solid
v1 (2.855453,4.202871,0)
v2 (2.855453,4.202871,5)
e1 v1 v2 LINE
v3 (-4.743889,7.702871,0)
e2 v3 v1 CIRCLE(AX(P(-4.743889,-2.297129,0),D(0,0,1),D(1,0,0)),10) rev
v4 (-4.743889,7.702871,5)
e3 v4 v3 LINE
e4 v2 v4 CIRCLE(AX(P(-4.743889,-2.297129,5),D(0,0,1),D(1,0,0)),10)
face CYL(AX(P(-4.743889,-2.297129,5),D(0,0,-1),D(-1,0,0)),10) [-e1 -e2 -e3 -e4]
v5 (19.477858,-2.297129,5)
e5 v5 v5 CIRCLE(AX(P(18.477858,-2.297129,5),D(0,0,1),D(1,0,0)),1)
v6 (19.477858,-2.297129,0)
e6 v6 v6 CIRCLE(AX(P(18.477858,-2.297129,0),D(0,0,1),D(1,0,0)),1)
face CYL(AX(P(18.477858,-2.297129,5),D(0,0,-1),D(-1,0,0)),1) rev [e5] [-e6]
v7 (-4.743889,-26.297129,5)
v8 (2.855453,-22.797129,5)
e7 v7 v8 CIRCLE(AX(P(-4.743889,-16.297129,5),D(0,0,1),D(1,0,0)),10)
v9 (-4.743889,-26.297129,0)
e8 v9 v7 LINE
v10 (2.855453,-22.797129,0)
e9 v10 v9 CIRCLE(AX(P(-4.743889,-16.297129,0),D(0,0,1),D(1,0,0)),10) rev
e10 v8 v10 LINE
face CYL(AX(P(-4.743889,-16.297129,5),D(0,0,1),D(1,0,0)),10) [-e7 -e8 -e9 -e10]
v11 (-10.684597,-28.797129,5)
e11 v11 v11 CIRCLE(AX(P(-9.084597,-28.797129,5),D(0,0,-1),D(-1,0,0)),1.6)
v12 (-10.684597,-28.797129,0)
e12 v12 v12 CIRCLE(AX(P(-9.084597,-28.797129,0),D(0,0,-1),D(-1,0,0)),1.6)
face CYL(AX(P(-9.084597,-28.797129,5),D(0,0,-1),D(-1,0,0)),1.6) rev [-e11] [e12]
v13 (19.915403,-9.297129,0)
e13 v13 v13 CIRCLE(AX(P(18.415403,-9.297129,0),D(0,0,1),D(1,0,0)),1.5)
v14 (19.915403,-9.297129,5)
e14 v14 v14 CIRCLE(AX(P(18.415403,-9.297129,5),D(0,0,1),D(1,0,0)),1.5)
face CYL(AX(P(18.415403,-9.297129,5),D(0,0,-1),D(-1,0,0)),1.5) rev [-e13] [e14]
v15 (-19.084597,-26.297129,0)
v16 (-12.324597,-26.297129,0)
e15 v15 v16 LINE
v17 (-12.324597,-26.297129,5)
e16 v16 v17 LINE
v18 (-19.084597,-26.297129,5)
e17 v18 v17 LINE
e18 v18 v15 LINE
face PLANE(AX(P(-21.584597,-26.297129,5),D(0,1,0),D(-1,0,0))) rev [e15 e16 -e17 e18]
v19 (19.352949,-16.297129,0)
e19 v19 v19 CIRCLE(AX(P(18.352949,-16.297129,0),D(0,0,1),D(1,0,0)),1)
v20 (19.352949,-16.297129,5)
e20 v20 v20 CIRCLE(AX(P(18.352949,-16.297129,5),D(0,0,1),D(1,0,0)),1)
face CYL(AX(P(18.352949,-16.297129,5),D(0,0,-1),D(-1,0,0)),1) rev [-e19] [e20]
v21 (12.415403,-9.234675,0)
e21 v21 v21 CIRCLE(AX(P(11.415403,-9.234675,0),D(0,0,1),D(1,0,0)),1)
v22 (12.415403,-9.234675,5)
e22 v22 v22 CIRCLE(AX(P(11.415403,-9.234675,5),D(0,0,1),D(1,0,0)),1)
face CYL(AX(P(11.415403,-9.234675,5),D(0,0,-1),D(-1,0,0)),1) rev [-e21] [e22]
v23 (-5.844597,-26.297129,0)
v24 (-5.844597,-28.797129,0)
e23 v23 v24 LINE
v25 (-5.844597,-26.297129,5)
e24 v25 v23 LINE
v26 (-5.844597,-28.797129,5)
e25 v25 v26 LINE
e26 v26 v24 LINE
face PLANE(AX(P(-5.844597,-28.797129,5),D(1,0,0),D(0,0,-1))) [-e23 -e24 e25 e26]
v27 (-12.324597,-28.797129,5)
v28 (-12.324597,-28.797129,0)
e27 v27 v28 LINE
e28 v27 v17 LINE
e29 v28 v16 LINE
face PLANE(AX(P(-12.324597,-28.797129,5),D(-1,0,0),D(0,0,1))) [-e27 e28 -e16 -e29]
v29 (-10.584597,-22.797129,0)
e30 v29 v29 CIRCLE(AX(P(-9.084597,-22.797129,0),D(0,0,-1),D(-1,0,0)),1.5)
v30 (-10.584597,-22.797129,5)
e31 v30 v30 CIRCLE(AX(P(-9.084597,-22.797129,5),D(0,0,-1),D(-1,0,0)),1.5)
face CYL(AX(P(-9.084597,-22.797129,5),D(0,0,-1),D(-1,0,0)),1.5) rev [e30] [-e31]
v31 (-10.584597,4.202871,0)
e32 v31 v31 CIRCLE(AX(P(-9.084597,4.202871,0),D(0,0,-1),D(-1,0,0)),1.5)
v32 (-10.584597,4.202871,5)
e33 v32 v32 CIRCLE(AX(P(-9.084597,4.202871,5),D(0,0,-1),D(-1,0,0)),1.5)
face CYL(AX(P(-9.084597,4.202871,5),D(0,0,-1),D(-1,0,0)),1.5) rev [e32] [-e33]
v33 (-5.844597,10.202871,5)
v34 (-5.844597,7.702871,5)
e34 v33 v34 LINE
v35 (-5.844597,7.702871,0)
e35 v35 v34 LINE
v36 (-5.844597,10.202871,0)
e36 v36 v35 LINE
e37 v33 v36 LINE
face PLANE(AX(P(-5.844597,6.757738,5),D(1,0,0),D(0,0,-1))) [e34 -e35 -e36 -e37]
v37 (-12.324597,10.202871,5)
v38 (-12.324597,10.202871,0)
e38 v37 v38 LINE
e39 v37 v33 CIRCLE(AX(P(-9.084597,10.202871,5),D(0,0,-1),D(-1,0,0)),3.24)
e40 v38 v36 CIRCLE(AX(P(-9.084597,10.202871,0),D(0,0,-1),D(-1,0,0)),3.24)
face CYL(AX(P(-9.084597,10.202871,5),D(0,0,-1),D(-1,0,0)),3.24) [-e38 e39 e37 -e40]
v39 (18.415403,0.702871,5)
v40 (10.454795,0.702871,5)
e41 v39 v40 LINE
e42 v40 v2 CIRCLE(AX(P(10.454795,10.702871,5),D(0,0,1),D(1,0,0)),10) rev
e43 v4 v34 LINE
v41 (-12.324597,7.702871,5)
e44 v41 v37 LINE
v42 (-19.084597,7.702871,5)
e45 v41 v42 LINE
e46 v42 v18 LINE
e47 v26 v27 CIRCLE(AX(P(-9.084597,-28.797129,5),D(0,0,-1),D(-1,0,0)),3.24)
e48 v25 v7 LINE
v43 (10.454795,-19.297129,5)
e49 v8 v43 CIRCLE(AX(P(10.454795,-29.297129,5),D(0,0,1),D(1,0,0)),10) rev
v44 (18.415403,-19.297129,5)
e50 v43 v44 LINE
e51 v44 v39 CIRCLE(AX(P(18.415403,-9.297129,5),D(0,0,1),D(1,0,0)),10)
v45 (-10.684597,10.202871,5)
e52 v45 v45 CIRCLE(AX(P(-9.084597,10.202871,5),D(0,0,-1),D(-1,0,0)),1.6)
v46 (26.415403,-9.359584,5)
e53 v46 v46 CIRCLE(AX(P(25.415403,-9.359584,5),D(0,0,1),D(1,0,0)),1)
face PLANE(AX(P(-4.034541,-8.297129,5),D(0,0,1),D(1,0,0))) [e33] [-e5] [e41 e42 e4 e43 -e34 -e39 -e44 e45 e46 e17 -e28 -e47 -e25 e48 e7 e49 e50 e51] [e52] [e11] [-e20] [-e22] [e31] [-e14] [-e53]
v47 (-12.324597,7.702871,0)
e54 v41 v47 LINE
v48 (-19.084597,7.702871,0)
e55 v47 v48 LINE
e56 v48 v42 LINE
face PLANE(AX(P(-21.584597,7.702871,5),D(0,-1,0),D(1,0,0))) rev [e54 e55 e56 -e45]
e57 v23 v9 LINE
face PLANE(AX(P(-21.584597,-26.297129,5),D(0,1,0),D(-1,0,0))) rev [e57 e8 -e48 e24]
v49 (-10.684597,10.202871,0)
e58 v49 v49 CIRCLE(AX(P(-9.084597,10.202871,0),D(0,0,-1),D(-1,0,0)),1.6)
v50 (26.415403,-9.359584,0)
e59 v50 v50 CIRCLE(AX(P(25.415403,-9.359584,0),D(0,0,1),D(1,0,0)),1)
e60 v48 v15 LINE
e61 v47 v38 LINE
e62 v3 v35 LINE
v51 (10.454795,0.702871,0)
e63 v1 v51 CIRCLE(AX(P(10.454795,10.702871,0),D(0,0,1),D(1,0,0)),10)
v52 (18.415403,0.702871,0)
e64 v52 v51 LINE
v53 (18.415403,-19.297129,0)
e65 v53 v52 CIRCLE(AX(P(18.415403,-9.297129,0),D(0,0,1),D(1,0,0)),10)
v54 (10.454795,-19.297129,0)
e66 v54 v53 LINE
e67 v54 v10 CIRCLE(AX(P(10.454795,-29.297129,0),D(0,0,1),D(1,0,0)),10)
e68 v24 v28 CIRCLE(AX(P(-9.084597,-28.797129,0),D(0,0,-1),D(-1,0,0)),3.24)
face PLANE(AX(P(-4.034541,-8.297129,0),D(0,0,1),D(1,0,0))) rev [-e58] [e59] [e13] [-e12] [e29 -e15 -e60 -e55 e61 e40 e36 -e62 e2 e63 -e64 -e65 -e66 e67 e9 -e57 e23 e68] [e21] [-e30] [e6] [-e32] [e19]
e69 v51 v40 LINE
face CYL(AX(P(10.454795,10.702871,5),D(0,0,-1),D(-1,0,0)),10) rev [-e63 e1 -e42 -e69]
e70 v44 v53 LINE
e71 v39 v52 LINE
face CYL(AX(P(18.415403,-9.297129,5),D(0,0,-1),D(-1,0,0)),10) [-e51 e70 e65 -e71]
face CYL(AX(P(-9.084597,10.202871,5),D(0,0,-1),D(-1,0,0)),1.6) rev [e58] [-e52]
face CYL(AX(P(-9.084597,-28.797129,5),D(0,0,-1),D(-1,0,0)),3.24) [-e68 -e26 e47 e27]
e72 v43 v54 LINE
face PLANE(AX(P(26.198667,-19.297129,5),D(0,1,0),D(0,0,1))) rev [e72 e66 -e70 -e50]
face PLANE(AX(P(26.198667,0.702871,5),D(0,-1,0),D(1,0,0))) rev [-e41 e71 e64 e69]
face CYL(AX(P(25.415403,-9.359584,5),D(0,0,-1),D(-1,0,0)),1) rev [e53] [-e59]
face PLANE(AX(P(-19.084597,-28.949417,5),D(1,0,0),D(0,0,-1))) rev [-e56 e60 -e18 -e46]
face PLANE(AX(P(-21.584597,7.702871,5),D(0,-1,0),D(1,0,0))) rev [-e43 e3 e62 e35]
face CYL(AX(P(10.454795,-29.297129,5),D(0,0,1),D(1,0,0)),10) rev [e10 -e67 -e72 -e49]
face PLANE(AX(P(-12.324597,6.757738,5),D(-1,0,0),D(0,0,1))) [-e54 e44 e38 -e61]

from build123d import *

# Parameters (mm, degrees)
ESQUISSE1_R             = 1
ESQUISSE1_R_2           = 1.5
BOSS_EXTRU_1_DEPTH      = 5
ENL_V_MAT_EXTRU_1_DEPTH = 5
ESQUISSE3_W             = 20
ESQUISSE3_H             = 34
BOSS_EXTRU_2_DEPTH      = 5
ESQUISSE4_R             = 1.5
ESQUISSE4_W             = 9.798464728
ESQUISSE4_H             = 39.858161606
ENL_V_MAT_EXTRU_2_DEPTH = 5
ESQUISSE5_W             = 2.5
ESQUISSE5_H             = 34
BOSS_EXTRU_3_DEPTH      = 5
ESQUISSE6_R             = 1.6
BOSS_EXTRU_4_DEPTH      = 5
CONG_1_R                = 10
CONG_2_R                = 10


with BuildPart() as part:
    # Esquisse1 → Boss.-Extru.1 (new body)
    with BuildSketch(Plane.XY):
        with BuildLine():
            Line((-13.584596858, -30.047129187), (-13.584596858, -25.547129187))
            Line((-13.584596858, -25.547129187), (-13.584596858, -25.297129187))
            Line((-13.584596858, -25.297129187), (-13.834596858, -25.297129187))
            Line((-13.834596858, -25.297129187), (-16.334596858, -25.297129187))
            Line((-16.334596858, -25.297129187), (-16.584596858, -25.297129187))
            Line((-16.584596858, -25.297129187), (-16.584596858, -25.047129187))
            Line((-16.584596858, -25.047129187), (-16.584596858, 6.452870813))
            Line((-16.584596858, 6.452870813), (-16.584596858, 6.702870813))
            Line((-16.584596858, 6.702870813), (-16.334596858, 6.702870813))
            Line((-16.334596858, 6.702870813), (-13.834596858, 6.702870813))
            Line((-13.834596858, 6.702870813), (-13.584596858, 6.702870813))
            Line((-13.584596858, 6.702870813), (-13.584596858, 6.952870813))
            Line((-13.584596858, 6.952870813), (-13.584596858, 11.452870813))
            Line((-13.584596858, 11.452870813), (-13.584596858, 11.702870813))
            Line((-13.584596858, 11.702870813), (-13.334596858, 11.702870813))
            Line((-13.334596858, 11.702870813), (-8.584596858, 11.702870813))
            Line((-8.584596858, 11.702870813), (-8.584596858, 6.702870813))
            Line((-8.584596858, 6.702870813), (-7.491776281, 6.702870813))
            Line((-7.491776281, 6.702870813), (-4.034541178, 6.702870813))
            ThreePointArc((-4.034541178, 6.702870813), (-0.161557832, 6.19424756), (3.448773595, 4.702870813))
            ThreePointArc((3.448773595, 4.702870813), (10.66943645, 1.720117321), (18.415403142, 0.702870813))
            ThreePointArc((18.415403142, 0.702870813), (28.415403142, -9.297129187), (18.415403142, -19.297129187))
            ThreePointArc((18.415403142, -19.297129187), (10.66943645, -20.314375694), (3.448773595, -23.297129187))
            ThreePointArc((3.448773595, -23.297129187), (-0.161557832, -24.788505933), (-4.034541178, -25.297129187))
            Line((-4.034541178, -25.297129187), (-7.491776281, -25.297129187))
            Line((-7.491776281, -25.297129187), (-8.584596858, -25.297129187))
            Line((-8.584596858, -25.297129187), (-8.584596858, -30.297129187))
            Line((-8.584596858, -30.297129187), (-13.334596858, -30.297129187))
            Line((-13.334596858, -30.297129187), (-13.584596858, -30.297129187))
            Line((-13.584596858, -30.297129187), (-13.584596858, -30.047129187))
        make_face()
        with Locations((18.477857718, -2.297129187)):
            Circle(ESQUISSE1_R, mode=Mode.SUBTRACT)
        with Locations((25.415403142, -9.359583762)):
            Circle(ESQUISSE1_R, mode=Mode.SUBTRACT)
        with Locations((18.415403142, -9.297129187)):
            Circle(ESQUISSE1_R_2, mode=Mode.SUBTRACT)
        with Locations((11.415403142, -9.234674611)):
            Circle(ESQUISSE1_R, mode=Mode.SUBTRACT)
        with Locations((18.352948567, -16.297129187)):
            Circle(ESQUISSE1_R, mode=Mode.SUBTRACT)
    extrude(amount=BOSS_EXTRU_1_DEPTH)

    # Esquisse2 → Enlèv. mat.-Extru.1 (cut)
    with BuildSketch(Plane(origin=(0, 0, 0), x_dir=(-1, 0, 0), z_dir=(0, 0, -1))):
        Polygon((1.584596858, -19.297129187), (1.584596858, -25.297129187), (1.584596858, -26.297129187), (21.584596858, -26.297129187), (21.584596858, -33.65697819), (-26.833247513, -33.65697819), (-26.198667142, -19.297129187), align=None)
        Polygon((21.584596858, 7.702870813), (1.584596858, 7.702870813), (1.584596858, 6.702870813), (1.584596858, 0.702870813), (-26.198667142, 0.702870813), (-26.833247513, 15.062719816), (21.584596858, 15.062719816), align=None)
    extrude(amount=-ENL_V_MAT_EXTRU_1_DEPTH, mode=Mode.SUBTRACT)

    # Esquisse3 → Boss.-Extru.2 (add)
    with BuildSketch(Plane(origin=(0, 0, 0), x_dir=(-1, 0, 0), z_dir=(0, 0, -1))):
        with Locations((11.584596858, -9.297129187)):
            Rectangle(ESQUISSE3_W, ESQUISSE3_H)
    extrude(amount=-BOSS_EXTRU_2_DEPTH)

    # Esquisse4 → Enlèv. mat.-Extru.2 (cut)
    with BuildSketch(Plane(origin=(0, 0, 0), x_dir=(-1, 0, 0), z_dir=(0, 0, -1))):
        with Locations((9.084596858, -22.797129187)):
            Circle(ESQUISSE4_R)
        with Locations((9.084596858, 4.202870813)):
            Circle(ESQUISSE4_R)
        with Locations((23.983829222, -9.020336398)):
            Rectangle(ESQUISSE4_W, ESQUISSE4_H)
    extrude(amount=-ENL_V_MAT_EXTRU_2_DEPTH, mode=Mode.SUBTRACT)

    # Esquisse5 → Boss.-Extru.3 (add)
    with BuildSketch(Plane(origin=(0, 0, 0), x_dir=(-1, 0, 0), z_dir=(0, 0, -1))):
        with Locations((0.334596858, -9.297129187)):
            Rectangle(ESQUISSE5_W, ESQUISSE5_H)
    extrude(amount=-BOSS_EXTRU_3_DEPTH)

    # Esquisse6 → Boss.-Extru.4 (add)
    # profile 1 of 2: a face of its own
    with BuildSketch(Plane(origin=(0, 0, 0), x_dir=(-1, 0, 0), z_dir=(0, 0, -1))):
        with BuildLine():
            Line((12.324596858, -25.12480516), (5.844596858, -25.12480516))
            Line((5.844596858, -25.12480516), (5.844596858, -28.797129187))
            ThreePointArc((5.844596858, -28.797129187), (9.084596858, -32.037129187), (12.324596858, -28.797129187))
            Line((12.324596858, -28.797129187), (12.324596858, -25.12480516))
        make_face()
        with Locations((9.084596858, -28.797129187)):
            Circle(ESQUISSE6_R, mode=Mode.SUBTRACT)
    # profile 2 of 2: a face of its own
    with BuildSketch(Plane(origin=(0, 0, 0), x_dir=(-1, 0, 0), z_dir=(0, 0, -1))):
        with BuildLine():
            Line((12.324596858, 6.757738308), (5.844596858, 6.757738308))
            Line((5.844596858, 6.757738308), (5.844596858, 10.202870813))
            ThreePointArc((5.844596858, 10.202870813), (9.084596858, 13.442870813), (12.324596858, 10.202870813))
            Line((12.324596858, 10.202870813), (12.324596858, 6.757738308))
        make_face()
        with Locations((9.084596858, 10.202870813)):
            Circle(ESQUISSE6_R, mode=Mode.SUBTRACT)
    extrude(amount=-BOSS_EXTRU_4_DEPTH)

    # Congé1
    # the kernel refuses this fillet: 10 mm, written as the material it adds along each edge
    with BuildSketch(Plane(origin=(0.915403142, 0.702870813, 0), x_dir=(1, 0, 0), z_dir=(0, 0, 1))) as cong_1_piece_1:
        with BuildLine():
            CenterArc((9.539392014, 10), CONG_1_R, 197.457603124, 72.542396876)
            Line((0, 7), (-0.19078784, 6.94))
            ThreePointArc((-0.19078784, 6.94), (-0.2, 3.5), (-0.2, 0))
            Line((-0.2, 0), (0, -0.2))
            Line((0, -0.2), (9.539392014, -0.2))
            Line((9.539392014, -0.2), (9.539392014, 0))
        make_face()
    extrude(amount=5)
    with BuildSketch(Plane(origin=(0.915403142, -19.297129187, 5), x_dir=(0, -1, 0), z_dir=(0, 0, -1))) as cong_1_piece_2:
        with BuildLine():
            CenterArc((10, -9.539392014), CONG_1_R, 107.457603124, 72.542396876)
            Line((0, -9.539392014), (-0.2, -9.539392014))
            Line((-0.2, -9.539392014), (-0.2, 0))
            Line((-0.2, 0), (0, 0.2))
            ThreePointArc((0, 0.2), (3.5, 0.2), (6.94, 0.19078784))
            Line((6.94, 0.19078784), (7, 0))
        make_face()
    extrude(amount=5)

    # Congé2
    cong_2_edges = [part.edges().sort_by_distance(p)[0] for p in [
        (0.915403142, -26.297129187, 2.5),
        (0.915403142, 7.702870813, 2.5),
    ]]
    fillet(cong_2_edges, radius=CONG_2_R)


solid = part.part
